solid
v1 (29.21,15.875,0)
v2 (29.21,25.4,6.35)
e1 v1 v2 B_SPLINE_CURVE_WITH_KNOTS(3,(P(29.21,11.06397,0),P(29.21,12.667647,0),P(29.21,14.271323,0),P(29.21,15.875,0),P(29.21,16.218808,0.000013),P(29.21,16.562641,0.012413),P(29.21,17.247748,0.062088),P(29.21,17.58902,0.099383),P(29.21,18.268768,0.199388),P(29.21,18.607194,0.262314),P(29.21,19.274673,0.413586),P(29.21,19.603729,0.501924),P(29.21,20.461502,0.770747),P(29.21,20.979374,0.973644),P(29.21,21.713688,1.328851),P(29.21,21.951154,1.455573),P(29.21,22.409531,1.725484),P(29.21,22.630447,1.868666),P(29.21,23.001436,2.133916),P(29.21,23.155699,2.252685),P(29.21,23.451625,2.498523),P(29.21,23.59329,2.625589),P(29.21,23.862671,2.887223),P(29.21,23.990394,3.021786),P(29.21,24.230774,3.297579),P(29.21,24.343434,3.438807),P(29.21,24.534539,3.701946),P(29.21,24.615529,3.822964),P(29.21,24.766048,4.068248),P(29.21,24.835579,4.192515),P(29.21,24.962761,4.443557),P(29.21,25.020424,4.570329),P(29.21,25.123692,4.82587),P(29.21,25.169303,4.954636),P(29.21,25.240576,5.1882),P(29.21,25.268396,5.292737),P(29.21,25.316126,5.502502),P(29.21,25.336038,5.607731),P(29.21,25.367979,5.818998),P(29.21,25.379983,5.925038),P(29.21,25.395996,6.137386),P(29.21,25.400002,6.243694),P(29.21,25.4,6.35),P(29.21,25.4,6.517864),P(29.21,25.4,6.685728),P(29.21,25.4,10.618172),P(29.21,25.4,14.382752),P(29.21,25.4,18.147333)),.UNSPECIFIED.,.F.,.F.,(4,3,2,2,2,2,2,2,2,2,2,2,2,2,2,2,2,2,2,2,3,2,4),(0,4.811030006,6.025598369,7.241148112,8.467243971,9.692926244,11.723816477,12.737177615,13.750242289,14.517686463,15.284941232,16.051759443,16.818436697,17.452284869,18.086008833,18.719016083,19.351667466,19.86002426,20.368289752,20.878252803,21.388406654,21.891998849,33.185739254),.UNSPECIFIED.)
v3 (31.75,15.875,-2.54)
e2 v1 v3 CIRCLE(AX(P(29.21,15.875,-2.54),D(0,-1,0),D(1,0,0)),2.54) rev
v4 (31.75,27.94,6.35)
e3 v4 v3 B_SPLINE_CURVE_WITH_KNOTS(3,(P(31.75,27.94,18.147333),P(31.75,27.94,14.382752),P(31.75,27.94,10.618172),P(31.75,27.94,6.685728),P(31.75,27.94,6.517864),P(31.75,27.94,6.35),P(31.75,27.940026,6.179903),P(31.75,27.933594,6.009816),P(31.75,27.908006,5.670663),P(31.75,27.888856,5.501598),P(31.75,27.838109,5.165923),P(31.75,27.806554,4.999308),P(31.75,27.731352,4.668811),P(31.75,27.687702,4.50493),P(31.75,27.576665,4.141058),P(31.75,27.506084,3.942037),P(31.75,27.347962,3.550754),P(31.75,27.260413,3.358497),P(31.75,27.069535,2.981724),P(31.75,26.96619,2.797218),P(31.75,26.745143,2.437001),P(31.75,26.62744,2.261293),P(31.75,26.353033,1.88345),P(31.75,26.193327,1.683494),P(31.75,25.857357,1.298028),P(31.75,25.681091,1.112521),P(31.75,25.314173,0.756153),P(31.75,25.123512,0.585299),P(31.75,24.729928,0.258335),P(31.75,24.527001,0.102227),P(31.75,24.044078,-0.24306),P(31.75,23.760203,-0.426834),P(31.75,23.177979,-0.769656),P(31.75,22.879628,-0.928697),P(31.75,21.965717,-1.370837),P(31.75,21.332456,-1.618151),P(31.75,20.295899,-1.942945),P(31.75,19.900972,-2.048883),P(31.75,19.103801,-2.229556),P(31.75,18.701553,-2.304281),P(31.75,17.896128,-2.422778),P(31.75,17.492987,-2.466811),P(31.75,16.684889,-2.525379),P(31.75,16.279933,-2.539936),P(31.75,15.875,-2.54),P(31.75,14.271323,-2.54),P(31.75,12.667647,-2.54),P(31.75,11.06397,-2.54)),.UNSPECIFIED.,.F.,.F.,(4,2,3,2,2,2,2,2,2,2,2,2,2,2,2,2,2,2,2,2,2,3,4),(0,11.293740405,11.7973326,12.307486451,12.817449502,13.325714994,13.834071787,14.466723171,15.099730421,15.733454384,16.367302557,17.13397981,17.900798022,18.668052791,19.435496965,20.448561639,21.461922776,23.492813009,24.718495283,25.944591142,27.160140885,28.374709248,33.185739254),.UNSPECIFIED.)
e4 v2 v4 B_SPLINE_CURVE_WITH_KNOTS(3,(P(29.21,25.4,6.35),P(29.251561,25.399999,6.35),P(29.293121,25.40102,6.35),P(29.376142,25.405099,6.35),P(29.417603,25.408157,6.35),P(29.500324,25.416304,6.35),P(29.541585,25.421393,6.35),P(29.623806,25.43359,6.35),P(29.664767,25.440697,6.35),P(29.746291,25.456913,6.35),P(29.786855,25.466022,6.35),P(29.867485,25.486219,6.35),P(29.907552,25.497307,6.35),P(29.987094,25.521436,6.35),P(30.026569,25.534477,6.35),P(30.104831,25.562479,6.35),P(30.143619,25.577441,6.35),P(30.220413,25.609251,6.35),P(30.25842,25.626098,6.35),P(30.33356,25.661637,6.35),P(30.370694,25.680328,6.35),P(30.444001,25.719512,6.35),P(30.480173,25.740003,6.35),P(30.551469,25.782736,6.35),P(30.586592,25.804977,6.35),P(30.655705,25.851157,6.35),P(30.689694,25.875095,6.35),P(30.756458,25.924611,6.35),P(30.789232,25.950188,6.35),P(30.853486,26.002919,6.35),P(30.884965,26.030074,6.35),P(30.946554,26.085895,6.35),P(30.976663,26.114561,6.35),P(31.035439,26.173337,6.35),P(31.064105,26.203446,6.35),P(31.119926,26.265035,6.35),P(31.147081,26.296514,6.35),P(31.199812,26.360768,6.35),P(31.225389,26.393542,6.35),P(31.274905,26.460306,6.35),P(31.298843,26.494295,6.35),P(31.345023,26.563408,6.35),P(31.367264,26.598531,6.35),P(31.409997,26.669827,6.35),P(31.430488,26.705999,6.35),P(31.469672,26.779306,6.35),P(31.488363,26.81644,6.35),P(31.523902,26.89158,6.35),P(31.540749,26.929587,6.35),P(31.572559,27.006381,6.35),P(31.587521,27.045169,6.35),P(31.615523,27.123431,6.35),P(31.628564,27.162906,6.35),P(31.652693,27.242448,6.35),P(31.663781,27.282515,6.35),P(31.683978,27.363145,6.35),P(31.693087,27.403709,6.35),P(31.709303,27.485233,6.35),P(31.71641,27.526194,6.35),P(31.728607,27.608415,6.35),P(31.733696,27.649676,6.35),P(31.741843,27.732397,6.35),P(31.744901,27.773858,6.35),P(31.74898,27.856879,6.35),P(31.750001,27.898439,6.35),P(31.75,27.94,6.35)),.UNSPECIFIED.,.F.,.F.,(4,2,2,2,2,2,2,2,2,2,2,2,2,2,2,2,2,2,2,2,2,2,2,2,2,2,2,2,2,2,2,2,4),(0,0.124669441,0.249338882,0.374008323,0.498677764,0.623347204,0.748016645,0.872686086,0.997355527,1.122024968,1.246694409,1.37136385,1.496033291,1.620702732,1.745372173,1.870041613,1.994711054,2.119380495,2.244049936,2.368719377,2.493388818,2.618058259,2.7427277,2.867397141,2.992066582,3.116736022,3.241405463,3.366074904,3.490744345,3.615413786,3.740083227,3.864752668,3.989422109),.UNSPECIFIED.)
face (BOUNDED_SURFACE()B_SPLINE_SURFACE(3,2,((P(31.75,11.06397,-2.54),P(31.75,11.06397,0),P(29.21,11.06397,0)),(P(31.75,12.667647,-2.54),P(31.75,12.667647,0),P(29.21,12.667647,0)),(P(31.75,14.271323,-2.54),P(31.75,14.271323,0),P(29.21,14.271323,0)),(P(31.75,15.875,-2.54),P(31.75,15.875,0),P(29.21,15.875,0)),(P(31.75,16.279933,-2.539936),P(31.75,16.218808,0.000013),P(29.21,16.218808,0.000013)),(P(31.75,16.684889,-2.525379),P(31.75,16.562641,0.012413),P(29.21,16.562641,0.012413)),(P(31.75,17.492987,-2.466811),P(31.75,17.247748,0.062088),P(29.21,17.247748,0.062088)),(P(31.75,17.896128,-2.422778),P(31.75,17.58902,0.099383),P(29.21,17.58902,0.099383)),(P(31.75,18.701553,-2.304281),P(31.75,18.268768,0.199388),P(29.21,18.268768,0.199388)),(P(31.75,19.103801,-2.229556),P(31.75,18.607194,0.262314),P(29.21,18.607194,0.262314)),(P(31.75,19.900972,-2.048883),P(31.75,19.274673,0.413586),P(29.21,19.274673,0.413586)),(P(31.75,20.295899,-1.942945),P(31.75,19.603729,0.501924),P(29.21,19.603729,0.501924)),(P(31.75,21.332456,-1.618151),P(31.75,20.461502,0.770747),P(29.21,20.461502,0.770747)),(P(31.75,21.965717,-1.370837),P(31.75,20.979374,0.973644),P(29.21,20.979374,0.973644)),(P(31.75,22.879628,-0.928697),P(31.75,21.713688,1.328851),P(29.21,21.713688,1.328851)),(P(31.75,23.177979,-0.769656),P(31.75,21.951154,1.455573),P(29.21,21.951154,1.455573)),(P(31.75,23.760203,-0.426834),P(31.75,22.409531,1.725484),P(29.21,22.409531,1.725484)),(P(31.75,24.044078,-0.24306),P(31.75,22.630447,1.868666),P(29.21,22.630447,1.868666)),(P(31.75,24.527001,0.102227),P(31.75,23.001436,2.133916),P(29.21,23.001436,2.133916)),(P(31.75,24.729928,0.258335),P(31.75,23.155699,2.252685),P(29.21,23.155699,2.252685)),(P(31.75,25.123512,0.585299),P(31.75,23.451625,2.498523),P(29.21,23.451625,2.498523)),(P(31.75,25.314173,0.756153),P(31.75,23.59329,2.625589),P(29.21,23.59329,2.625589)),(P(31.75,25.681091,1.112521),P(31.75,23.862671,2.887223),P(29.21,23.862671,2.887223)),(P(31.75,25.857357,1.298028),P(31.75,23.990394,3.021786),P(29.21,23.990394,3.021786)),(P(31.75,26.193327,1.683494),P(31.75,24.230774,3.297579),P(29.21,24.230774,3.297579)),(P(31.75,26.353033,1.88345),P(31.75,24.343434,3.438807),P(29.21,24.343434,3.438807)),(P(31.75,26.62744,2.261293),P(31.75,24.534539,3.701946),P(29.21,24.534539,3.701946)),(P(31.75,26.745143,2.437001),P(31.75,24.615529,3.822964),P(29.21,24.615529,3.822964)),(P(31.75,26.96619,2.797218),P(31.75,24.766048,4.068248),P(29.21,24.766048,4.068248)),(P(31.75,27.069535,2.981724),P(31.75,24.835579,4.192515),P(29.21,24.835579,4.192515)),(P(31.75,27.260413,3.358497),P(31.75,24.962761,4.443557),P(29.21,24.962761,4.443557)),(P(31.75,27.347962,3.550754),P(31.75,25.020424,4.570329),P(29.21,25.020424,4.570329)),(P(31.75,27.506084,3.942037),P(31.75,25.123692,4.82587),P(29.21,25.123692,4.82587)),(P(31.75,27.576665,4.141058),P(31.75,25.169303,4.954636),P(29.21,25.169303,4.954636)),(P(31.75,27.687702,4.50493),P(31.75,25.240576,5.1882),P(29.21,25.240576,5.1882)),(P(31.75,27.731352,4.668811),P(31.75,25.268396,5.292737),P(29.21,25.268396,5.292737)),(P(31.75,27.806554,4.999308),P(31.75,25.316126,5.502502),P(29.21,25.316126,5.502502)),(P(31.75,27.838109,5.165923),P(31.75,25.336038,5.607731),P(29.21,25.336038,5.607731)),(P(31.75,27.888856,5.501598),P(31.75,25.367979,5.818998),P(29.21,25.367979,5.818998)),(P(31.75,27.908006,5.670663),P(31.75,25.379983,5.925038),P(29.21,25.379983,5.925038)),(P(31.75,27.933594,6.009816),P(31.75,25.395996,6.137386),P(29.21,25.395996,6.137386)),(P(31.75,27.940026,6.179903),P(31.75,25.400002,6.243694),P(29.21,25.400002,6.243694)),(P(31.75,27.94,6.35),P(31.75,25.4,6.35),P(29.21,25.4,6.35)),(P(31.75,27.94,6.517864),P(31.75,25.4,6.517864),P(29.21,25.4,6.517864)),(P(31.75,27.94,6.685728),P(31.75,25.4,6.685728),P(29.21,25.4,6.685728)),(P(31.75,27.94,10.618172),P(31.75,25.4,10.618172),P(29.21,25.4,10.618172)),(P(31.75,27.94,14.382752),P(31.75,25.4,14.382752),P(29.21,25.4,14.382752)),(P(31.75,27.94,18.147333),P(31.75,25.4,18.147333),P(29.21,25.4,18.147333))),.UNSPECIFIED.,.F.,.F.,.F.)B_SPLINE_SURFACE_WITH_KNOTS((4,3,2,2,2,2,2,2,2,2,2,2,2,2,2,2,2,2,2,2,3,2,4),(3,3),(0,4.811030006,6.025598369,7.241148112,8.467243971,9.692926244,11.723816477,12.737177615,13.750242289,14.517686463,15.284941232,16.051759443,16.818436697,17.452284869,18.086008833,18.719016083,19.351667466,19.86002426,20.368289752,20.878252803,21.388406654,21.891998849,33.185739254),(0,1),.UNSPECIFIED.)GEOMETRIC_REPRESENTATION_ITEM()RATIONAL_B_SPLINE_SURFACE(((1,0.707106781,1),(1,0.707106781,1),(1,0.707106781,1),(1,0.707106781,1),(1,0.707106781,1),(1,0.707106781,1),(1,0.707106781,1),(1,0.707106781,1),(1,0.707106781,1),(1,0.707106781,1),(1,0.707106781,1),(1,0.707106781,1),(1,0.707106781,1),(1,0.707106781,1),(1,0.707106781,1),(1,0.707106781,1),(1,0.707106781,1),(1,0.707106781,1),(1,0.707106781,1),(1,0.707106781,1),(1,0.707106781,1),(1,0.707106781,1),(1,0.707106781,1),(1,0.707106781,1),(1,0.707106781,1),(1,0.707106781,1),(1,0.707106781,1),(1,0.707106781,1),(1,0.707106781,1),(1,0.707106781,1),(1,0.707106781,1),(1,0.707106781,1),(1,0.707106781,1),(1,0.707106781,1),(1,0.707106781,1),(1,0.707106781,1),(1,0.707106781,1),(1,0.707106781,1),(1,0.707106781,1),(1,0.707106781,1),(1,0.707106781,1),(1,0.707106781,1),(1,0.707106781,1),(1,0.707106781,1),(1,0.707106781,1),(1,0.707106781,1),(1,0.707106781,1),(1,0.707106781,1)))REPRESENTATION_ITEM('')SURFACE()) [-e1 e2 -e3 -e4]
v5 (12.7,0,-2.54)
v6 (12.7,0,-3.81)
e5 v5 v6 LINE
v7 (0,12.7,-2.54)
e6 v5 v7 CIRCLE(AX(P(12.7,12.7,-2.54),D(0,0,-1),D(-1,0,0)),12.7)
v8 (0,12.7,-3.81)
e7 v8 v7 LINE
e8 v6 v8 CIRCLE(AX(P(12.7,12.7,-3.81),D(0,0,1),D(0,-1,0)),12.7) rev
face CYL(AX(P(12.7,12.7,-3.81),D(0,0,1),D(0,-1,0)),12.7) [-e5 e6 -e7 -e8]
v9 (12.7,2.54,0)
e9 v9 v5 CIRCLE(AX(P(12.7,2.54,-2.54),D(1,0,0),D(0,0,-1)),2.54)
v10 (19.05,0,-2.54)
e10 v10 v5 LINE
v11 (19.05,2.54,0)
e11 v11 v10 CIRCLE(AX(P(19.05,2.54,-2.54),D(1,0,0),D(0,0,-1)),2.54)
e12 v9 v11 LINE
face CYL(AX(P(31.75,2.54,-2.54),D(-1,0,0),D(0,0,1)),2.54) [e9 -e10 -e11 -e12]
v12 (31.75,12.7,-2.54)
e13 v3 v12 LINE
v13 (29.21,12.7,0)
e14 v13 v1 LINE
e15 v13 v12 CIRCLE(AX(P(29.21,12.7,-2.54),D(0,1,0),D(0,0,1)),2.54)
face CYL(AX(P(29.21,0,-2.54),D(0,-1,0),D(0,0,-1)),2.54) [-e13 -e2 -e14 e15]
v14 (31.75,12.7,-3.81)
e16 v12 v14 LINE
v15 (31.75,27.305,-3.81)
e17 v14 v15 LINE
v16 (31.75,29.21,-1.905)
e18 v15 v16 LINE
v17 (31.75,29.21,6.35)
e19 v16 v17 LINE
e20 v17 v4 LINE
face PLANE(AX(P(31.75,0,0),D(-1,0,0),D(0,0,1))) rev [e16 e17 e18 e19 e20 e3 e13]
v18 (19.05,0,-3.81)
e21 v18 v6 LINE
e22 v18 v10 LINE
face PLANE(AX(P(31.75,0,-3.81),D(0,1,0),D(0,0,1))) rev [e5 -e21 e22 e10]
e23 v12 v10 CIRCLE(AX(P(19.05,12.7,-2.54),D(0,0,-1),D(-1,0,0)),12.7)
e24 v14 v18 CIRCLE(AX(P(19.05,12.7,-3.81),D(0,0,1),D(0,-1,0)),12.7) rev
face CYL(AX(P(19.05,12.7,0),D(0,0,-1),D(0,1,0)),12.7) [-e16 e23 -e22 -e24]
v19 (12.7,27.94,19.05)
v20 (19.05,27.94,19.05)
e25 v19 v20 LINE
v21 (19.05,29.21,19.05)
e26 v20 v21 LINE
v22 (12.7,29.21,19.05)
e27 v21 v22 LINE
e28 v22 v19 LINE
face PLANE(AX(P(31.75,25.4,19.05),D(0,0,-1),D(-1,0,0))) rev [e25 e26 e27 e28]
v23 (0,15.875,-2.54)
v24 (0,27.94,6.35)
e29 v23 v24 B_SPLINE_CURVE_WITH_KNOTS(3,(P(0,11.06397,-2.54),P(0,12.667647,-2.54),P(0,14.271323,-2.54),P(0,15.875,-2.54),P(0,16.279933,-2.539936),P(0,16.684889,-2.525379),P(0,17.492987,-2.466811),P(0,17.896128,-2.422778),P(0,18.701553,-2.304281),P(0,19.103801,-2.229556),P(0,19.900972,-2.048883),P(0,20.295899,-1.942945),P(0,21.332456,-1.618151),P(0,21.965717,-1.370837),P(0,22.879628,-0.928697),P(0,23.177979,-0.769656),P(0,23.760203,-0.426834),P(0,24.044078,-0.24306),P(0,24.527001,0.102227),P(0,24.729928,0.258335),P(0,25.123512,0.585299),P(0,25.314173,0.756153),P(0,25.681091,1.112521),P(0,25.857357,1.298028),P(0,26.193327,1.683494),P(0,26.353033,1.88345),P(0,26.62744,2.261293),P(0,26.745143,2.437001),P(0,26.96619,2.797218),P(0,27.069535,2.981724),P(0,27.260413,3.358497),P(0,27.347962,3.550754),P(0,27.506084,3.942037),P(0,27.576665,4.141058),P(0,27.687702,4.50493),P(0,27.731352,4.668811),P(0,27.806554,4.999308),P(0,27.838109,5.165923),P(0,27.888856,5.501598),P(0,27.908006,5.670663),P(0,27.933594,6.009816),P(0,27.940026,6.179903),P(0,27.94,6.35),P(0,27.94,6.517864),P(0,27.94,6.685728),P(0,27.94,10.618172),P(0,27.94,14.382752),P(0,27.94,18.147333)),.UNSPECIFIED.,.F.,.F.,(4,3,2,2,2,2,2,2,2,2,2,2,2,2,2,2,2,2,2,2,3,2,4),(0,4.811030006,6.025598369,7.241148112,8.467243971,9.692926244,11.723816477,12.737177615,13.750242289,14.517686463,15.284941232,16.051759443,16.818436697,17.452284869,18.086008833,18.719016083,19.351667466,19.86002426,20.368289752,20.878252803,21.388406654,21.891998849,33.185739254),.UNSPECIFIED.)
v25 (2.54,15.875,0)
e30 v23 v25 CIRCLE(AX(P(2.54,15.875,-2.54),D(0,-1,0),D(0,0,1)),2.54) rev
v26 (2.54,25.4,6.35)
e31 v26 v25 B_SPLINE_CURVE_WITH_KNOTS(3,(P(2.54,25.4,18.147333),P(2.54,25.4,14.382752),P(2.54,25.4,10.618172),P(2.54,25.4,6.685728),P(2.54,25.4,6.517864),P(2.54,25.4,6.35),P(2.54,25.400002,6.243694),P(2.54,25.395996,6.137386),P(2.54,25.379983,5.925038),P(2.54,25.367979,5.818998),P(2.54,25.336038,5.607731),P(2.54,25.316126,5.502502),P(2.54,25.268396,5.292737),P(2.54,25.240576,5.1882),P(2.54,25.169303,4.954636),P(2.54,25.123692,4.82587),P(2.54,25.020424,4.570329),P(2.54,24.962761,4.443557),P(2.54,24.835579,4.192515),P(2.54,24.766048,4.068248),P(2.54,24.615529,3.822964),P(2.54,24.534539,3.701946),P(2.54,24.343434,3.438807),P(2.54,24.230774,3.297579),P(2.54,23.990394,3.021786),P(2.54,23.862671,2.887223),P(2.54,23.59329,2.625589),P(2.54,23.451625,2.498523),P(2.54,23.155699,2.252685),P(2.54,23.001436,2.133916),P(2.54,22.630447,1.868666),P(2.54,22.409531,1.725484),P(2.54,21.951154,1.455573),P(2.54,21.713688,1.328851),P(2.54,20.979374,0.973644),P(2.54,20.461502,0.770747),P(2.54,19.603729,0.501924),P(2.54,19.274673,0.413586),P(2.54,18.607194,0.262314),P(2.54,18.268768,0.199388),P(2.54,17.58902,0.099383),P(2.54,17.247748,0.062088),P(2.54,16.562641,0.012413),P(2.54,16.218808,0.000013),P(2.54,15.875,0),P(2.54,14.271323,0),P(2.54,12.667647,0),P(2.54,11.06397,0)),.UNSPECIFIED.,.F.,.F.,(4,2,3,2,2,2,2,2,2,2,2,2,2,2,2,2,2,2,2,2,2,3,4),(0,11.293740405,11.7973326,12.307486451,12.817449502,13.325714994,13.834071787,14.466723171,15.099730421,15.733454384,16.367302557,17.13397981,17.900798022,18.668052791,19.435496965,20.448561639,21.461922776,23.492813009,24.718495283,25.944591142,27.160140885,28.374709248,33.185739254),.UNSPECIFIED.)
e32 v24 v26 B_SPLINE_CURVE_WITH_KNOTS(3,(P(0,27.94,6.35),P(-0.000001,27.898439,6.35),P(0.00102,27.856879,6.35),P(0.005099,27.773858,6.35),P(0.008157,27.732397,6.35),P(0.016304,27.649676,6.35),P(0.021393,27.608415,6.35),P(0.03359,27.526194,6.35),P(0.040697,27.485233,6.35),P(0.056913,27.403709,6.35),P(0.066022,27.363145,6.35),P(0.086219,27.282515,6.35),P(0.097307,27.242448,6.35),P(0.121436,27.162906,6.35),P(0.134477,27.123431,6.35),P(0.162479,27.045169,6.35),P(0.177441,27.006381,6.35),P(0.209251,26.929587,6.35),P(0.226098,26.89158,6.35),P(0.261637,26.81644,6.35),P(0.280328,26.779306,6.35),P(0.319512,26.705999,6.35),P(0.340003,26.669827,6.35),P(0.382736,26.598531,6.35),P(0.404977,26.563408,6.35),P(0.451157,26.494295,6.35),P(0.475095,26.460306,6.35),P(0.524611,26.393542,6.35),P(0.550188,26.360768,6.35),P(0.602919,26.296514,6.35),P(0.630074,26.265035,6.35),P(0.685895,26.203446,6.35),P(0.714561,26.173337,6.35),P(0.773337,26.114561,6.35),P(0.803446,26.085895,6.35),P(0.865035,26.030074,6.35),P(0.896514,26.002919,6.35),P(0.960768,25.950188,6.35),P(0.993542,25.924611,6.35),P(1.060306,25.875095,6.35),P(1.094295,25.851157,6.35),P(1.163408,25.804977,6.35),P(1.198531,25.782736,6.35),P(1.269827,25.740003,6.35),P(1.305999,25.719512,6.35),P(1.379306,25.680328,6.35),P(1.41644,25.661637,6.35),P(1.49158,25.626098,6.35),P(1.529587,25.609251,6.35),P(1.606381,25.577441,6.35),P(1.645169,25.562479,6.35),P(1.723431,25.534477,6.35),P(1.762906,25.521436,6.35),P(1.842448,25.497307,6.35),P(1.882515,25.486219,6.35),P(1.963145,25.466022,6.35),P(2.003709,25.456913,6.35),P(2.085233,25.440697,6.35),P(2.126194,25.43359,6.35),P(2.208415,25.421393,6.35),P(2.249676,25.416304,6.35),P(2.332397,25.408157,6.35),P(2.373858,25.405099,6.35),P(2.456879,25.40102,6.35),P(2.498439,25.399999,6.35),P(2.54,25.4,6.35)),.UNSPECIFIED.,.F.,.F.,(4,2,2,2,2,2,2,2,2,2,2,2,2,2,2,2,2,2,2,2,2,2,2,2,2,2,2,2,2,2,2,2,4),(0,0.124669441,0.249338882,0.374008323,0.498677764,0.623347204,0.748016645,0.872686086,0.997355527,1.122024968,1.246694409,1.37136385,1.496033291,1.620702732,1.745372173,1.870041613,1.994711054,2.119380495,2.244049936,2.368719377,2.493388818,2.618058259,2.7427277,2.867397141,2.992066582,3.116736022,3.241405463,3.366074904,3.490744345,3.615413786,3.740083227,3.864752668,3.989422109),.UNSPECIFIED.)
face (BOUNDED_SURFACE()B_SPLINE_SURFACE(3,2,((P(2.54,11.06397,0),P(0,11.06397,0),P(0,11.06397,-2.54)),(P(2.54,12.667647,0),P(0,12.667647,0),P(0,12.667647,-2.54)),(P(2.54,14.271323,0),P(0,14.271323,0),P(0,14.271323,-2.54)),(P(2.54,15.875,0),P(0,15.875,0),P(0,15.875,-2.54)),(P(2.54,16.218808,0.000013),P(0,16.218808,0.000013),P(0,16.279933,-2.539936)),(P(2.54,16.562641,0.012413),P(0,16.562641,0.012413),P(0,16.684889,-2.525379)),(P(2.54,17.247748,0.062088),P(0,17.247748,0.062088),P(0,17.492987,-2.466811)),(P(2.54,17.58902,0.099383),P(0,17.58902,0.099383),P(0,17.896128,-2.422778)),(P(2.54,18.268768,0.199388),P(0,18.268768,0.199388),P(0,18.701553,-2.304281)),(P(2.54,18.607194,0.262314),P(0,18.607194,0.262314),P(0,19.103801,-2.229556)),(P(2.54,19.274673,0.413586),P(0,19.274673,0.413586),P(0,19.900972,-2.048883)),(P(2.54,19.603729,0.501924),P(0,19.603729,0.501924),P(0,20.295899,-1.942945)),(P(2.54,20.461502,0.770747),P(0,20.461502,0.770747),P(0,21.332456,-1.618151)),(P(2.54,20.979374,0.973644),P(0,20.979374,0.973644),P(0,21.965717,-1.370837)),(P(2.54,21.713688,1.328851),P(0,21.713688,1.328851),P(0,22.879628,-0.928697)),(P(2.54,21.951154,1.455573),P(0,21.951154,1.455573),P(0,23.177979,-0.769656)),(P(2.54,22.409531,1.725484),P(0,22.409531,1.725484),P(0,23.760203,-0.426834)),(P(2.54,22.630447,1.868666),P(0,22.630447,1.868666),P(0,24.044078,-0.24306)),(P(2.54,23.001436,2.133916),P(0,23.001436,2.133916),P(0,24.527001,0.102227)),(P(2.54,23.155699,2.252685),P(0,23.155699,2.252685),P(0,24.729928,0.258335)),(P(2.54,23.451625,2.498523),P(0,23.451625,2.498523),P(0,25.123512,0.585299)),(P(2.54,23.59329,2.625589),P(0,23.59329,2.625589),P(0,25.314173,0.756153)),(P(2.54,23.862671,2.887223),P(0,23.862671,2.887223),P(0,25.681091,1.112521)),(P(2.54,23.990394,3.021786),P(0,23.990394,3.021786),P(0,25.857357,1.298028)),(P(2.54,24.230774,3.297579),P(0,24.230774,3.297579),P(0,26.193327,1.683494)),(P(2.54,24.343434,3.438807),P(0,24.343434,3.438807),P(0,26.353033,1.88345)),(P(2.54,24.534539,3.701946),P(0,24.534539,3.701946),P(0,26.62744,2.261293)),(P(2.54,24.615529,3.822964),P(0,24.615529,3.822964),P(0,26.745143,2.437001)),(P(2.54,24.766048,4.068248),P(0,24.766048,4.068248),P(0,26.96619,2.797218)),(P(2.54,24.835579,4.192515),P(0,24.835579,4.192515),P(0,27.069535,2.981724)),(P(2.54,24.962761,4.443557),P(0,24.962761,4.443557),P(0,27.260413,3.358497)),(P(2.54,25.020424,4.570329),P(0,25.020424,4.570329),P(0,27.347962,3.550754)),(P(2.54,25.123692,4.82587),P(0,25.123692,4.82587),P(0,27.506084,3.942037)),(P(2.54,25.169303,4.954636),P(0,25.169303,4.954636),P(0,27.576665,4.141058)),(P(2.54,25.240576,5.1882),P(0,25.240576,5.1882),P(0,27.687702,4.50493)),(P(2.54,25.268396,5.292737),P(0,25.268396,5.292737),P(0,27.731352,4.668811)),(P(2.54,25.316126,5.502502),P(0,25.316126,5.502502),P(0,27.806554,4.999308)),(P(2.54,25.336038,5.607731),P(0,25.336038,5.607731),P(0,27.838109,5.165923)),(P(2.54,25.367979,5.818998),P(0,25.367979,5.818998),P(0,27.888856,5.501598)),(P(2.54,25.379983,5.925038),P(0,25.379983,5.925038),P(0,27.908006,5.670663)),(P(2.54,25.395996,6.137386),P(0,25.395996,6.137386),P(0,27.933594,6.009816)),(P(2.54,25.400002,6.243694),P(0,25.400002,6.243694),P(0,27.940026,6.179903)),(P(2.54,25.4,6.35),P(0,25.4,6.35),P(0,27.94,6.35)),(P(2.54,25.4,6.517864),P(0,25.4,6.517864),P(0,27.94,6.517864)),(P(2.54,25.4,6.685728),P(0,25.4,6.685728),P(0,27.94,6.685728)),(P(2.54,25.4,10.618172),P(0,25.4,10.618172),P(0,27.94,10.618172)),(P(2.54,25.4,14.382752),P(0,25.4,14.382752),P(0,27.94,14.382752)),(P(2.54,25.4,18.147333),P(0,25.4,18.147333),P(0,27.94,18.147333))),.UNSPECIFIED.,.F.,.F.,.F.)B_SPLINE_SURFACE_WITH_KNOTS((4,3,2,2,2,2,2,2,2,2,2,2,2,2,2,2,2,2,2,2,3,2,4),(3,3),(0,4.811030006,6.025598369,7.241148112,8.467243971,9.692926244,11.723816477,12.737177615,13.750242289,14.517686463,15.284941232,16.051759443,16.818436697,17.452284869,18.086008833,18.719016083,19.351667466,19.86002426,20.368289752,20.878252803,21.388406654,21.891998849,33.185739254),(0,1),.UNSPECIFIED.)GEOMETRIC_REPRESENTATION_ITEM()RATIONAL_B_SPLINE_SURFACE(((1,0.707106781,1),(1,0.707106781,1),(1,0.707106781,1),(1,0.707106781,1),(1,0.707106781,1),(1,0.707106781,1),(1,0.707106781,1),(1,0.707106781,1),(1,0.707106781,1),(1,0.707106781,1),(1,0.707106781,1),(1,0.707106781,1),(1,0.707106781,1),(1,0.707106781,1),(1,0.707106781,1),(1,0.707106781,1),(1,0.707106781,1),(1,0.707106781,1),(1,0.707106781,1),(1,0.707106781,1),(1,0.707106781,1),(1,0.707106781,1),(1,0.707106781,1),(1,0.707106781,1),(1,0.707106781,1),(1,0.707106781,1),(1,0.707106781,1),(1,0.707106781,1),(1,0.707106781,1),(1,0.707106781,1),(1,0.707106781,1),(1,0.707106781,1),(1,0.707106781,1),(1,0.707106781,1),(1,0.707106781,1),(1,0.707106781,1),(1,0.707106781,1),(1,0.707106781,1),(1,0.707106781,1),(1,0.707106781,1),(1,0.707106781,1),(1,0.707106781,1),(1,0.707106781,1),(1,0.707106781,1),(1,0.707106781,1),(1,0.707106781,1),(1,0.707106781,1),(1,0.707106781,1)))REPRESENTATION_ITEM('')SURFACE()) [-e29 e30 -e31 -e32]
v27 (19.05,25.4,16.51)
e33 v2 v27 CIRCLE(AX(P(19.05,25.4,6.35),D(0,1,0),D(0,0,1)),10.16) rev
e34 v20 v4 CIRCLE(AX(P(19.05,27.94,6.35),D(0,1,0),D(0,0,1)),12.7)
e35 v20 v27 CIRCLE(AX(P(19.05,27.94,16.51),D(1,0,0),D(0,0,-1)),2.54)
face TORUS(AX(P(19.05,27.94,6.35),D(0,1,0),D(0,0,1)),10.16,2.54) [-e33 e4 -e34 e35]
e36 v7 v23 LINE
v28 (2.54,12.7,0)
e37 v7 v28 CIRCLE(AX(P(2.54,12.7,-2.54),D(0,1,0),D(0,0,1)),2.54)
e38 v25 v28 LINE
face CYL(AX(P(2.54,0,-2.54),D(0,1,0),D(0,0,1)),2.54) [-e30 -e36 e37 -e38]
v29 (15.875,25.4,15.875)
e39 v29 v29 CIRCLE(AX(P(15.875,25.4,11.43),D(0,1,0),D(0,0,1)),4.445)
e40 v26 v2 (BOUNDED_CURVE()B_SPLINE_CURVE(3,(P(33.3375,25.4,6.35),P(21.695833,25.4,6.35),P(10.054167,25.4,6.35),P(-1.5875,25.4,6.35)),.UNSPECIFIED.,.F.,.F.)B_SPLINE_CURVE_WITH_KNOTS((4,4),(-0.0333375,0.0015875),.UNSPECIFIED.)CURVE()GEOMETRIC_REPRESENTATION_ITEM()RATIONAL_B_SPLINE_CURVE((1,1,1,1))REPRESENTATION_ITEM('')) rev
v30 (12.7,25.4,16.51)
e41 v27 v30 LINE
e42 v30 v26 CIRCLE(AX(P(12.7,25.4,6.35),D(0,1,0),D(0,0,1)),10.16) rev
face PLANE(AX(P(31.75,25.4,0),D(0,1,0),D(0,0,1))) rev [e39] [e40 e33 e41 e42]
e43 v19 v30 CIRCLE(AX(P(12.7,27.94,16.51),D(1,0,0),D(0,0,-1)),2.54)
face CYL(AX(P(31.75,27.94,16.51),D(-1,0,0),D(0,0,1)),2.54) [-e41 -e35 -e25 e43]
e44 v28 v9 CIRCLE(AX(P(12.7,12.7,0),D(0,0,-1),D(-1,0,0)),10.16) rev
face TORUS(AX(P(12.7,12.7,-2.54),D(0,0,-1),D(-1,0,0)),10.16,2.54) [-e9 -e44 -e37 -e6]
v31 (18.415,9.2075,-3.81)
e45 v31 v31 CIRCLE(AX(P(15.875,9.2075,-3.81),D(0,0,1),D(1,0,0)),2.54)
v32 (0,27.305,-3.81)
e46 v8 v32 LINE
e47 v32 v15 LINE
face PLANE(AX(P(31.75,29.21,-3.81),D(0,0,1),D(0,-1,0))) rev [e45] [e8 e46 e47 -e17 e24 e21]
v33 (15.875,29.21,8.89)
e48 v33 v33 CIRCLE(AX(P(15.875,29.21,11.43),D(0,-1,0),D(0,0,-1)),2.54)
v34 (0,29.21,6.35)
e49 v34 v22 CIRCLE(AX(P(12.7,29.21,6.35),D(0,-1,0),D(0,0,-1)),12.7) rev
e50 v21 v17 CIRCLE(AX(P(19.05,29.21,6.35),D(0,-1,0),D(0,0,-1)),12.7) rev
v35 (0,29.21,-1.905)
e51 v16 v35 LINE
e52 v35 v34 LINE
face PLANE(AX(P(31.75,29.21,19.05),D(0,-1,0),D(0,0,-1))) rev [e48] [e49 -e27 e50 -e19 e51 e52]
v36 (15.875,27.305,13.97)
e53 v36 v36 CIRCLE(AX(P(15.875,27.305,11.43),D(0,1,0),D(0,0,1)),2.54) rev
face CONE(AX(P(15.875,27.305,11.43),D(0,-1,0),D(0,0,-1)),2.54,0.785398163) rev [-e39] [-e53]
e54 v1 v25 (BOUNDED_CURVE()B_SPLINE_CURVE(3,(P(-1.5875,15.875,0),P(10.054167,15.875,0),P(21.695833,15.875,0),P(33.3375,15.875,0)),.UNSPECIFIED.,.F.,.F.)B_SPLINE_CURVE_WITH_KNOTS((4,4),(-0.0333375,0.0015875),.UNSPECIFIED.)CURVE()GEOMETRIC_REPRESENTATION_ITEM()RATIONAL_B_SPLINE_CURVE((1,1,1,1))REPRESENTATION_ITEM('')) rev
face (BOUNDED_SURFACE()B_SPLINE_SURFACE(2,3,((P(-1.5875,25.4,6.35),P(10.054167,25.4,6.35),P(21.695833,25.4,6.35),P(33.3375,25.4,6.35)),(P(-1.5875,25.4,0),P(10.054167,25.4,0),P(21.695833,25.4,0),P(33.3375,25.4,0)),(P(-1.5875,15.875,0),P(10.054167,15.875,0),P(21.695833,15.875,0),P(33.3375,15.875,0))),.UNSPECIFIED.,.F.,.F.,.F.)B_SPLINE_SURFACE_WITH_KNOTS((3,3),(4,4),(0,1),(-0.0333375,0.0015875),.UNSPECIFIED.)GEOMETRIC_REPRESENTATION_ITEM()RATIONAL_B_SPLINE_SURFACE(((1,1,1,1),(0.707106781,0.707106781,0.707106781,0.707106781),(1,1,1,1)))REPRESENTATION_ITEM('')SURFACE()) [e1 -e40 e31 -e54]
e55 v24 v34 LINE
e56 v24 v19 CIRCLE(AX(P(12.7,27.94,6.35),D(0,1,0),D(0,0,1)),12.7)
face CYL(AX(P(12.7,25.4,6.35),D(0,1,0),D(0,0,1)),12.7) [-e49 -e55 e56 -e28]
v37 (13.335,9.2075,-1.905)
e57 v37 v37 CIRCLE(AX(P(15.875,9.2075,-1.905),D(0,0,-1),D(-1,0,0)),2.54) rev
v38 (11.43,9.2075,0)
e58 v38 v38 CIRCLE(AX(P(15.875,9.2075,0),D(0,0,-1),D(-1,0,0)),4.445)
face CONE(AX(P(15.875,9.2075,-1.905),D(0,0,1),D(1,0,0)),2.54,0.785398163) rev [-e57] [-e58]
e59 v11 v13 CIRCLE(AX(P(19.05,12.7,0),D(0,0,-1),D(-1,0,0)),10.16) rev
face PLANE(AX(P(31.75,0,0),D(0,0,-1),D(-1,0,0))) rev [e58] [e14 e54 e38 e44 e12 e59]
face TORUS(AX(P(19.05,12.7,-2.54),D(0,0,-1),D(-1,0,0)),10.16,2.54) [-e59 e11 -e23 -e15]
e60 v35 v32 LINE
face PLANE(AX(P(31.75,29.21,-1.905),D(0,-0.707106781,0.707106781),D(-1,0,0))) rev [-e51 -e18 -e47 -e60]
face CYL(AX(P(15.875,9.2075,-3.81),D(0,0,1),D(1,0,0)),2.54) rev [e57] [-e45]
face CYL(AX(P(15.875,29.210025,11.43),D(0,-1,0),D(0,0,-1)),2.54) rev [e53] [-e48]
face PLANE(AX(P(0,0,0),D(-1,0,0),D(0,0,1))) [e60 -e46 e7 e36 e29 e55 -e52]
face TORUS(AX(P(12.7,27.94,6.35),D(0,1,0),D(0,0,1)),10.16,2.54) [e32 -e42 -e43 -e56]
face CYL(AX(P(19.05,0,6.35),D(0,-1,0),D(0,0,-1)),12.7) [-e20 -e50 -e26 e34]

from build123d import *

# Parameters (mm, degrees)
BOSS_EXTRUDE1_DEPTH = 31.75
FILLET3_R           = 12.7
FILLET1_SIZE        = 9.525
FILLET1_SIZE_2      = 6.35
FILLET2_R           = 2.54
SKETCH3_R           = 2.54
CUT_EXTRUDE1_DEPTH  = 48.161309524
SKETCH4_R           = 2.54
CUT_EXTRUDE2_DEPTH  = 45.901280775
CHAMFER1_SIZE       = 1.905


with BuildPart() as part:
    # Sketch1 → Boss-Extrude1 (new body)
    with BuildSketch(Plane(origin=(0, 0, 0), x_dir=(0, 0, -1), z_dir=(1, 0, 0))):
        Polygon((0, 0), (0, 25.4), (-19.05, 25.4), (-19.05, 29.21), (3.81, 29.21), (3.81, 0), align=None)
    extrude(amount=BOSS_EXTRUDE1_DEPTH)

    # Fillet3
    fillet3_edges = [part.edges().sort_by_distance(p)[0] for p in [
        (31.75, 27.305, 19.05),
        (31.75, 0, -1.905),
        (0, 27.305, 19.05),
        (0, 0, -1.905),
    ]]
    fillet(fillet3_edges, radius=FILLET3_R)

    # Fillet1
    # an asymmetric fillet: 9.525, 6.35 mm, written as the material it adds along each edge
    with BuildSketch(Plane(origin=(0, 25.4, 0), x_dir=(0, -1, 0), z_dir=(1, 0, 0))) as fillet1_piece_1:
        with BuildLine():
            Bezier((FILLET1_SIZE, 0), (0, 0), (0, -FILLET1_SIZE_2), weights=[1, 0.707106781, 1])
            Line((0, -FILLET1_SIZE_2), (0, 0))
            Line((0, 0), (FILLET1_SIZE, 0))
        make_face()
    extrude(amount=31.75)

    # Fillet2
    fillet2_edges = [part.edges().sort_by_distance(p)[0] for p in [
        (15.875, 0, 0),
        (15.875, 25.4, 19.05),
        (28.030256121, 25.4, 15.330256121),
        (31.75, 21.935812925, 1.451375627),
        (31.75, 14.2875, 0),
        (28.030256121, 3.719743879, 0),
        (3.719743879, 3.719743879, 0),
        (0, 14.2875, 0),
        (0, 21.935812925, 1.451375627),
        (3.719743879, 25.4, 15.330256121),
    ]]
    fillet(fillet2_edges, radius=FILLET2_R)

    # Sketch3 → Cut-Extrude1 (cut, through all)
    with BuildSketch(Plane.XY):
        with Locations((15.875, 9.2075)):
            Circle(SKETCH3_R)
    extrude(amount=-CUT_EXTRUDE1_DEPTH, mode=Mode.SUBTRACT)

    # Sketch4 → Cut-Extrude2 (cut, through all)
    with BuildSketch(Plane.XZ.offset(-25.4)):
        with Locations(Location((15.875, 11.43, 0), (0, 0, 270))):
            Circle(SKETCH4_R)
    extrude(amount=-CUT_EXTRUDE2_DEPTH, mode=Mode.SUBTRACT)

    # Chamfer1
    chamfer1_edges = [part.edges().sort_by_distance(p)[0] for p in [
        (15.875, 29.21, -3.81),
        (13.335, 9.2075, 0),
        (15.875, 25.4, 13.97),
    ]]
    chamfer(chamfer1_edges, length=CHAMFER1_SIZE)


solid = part.part
